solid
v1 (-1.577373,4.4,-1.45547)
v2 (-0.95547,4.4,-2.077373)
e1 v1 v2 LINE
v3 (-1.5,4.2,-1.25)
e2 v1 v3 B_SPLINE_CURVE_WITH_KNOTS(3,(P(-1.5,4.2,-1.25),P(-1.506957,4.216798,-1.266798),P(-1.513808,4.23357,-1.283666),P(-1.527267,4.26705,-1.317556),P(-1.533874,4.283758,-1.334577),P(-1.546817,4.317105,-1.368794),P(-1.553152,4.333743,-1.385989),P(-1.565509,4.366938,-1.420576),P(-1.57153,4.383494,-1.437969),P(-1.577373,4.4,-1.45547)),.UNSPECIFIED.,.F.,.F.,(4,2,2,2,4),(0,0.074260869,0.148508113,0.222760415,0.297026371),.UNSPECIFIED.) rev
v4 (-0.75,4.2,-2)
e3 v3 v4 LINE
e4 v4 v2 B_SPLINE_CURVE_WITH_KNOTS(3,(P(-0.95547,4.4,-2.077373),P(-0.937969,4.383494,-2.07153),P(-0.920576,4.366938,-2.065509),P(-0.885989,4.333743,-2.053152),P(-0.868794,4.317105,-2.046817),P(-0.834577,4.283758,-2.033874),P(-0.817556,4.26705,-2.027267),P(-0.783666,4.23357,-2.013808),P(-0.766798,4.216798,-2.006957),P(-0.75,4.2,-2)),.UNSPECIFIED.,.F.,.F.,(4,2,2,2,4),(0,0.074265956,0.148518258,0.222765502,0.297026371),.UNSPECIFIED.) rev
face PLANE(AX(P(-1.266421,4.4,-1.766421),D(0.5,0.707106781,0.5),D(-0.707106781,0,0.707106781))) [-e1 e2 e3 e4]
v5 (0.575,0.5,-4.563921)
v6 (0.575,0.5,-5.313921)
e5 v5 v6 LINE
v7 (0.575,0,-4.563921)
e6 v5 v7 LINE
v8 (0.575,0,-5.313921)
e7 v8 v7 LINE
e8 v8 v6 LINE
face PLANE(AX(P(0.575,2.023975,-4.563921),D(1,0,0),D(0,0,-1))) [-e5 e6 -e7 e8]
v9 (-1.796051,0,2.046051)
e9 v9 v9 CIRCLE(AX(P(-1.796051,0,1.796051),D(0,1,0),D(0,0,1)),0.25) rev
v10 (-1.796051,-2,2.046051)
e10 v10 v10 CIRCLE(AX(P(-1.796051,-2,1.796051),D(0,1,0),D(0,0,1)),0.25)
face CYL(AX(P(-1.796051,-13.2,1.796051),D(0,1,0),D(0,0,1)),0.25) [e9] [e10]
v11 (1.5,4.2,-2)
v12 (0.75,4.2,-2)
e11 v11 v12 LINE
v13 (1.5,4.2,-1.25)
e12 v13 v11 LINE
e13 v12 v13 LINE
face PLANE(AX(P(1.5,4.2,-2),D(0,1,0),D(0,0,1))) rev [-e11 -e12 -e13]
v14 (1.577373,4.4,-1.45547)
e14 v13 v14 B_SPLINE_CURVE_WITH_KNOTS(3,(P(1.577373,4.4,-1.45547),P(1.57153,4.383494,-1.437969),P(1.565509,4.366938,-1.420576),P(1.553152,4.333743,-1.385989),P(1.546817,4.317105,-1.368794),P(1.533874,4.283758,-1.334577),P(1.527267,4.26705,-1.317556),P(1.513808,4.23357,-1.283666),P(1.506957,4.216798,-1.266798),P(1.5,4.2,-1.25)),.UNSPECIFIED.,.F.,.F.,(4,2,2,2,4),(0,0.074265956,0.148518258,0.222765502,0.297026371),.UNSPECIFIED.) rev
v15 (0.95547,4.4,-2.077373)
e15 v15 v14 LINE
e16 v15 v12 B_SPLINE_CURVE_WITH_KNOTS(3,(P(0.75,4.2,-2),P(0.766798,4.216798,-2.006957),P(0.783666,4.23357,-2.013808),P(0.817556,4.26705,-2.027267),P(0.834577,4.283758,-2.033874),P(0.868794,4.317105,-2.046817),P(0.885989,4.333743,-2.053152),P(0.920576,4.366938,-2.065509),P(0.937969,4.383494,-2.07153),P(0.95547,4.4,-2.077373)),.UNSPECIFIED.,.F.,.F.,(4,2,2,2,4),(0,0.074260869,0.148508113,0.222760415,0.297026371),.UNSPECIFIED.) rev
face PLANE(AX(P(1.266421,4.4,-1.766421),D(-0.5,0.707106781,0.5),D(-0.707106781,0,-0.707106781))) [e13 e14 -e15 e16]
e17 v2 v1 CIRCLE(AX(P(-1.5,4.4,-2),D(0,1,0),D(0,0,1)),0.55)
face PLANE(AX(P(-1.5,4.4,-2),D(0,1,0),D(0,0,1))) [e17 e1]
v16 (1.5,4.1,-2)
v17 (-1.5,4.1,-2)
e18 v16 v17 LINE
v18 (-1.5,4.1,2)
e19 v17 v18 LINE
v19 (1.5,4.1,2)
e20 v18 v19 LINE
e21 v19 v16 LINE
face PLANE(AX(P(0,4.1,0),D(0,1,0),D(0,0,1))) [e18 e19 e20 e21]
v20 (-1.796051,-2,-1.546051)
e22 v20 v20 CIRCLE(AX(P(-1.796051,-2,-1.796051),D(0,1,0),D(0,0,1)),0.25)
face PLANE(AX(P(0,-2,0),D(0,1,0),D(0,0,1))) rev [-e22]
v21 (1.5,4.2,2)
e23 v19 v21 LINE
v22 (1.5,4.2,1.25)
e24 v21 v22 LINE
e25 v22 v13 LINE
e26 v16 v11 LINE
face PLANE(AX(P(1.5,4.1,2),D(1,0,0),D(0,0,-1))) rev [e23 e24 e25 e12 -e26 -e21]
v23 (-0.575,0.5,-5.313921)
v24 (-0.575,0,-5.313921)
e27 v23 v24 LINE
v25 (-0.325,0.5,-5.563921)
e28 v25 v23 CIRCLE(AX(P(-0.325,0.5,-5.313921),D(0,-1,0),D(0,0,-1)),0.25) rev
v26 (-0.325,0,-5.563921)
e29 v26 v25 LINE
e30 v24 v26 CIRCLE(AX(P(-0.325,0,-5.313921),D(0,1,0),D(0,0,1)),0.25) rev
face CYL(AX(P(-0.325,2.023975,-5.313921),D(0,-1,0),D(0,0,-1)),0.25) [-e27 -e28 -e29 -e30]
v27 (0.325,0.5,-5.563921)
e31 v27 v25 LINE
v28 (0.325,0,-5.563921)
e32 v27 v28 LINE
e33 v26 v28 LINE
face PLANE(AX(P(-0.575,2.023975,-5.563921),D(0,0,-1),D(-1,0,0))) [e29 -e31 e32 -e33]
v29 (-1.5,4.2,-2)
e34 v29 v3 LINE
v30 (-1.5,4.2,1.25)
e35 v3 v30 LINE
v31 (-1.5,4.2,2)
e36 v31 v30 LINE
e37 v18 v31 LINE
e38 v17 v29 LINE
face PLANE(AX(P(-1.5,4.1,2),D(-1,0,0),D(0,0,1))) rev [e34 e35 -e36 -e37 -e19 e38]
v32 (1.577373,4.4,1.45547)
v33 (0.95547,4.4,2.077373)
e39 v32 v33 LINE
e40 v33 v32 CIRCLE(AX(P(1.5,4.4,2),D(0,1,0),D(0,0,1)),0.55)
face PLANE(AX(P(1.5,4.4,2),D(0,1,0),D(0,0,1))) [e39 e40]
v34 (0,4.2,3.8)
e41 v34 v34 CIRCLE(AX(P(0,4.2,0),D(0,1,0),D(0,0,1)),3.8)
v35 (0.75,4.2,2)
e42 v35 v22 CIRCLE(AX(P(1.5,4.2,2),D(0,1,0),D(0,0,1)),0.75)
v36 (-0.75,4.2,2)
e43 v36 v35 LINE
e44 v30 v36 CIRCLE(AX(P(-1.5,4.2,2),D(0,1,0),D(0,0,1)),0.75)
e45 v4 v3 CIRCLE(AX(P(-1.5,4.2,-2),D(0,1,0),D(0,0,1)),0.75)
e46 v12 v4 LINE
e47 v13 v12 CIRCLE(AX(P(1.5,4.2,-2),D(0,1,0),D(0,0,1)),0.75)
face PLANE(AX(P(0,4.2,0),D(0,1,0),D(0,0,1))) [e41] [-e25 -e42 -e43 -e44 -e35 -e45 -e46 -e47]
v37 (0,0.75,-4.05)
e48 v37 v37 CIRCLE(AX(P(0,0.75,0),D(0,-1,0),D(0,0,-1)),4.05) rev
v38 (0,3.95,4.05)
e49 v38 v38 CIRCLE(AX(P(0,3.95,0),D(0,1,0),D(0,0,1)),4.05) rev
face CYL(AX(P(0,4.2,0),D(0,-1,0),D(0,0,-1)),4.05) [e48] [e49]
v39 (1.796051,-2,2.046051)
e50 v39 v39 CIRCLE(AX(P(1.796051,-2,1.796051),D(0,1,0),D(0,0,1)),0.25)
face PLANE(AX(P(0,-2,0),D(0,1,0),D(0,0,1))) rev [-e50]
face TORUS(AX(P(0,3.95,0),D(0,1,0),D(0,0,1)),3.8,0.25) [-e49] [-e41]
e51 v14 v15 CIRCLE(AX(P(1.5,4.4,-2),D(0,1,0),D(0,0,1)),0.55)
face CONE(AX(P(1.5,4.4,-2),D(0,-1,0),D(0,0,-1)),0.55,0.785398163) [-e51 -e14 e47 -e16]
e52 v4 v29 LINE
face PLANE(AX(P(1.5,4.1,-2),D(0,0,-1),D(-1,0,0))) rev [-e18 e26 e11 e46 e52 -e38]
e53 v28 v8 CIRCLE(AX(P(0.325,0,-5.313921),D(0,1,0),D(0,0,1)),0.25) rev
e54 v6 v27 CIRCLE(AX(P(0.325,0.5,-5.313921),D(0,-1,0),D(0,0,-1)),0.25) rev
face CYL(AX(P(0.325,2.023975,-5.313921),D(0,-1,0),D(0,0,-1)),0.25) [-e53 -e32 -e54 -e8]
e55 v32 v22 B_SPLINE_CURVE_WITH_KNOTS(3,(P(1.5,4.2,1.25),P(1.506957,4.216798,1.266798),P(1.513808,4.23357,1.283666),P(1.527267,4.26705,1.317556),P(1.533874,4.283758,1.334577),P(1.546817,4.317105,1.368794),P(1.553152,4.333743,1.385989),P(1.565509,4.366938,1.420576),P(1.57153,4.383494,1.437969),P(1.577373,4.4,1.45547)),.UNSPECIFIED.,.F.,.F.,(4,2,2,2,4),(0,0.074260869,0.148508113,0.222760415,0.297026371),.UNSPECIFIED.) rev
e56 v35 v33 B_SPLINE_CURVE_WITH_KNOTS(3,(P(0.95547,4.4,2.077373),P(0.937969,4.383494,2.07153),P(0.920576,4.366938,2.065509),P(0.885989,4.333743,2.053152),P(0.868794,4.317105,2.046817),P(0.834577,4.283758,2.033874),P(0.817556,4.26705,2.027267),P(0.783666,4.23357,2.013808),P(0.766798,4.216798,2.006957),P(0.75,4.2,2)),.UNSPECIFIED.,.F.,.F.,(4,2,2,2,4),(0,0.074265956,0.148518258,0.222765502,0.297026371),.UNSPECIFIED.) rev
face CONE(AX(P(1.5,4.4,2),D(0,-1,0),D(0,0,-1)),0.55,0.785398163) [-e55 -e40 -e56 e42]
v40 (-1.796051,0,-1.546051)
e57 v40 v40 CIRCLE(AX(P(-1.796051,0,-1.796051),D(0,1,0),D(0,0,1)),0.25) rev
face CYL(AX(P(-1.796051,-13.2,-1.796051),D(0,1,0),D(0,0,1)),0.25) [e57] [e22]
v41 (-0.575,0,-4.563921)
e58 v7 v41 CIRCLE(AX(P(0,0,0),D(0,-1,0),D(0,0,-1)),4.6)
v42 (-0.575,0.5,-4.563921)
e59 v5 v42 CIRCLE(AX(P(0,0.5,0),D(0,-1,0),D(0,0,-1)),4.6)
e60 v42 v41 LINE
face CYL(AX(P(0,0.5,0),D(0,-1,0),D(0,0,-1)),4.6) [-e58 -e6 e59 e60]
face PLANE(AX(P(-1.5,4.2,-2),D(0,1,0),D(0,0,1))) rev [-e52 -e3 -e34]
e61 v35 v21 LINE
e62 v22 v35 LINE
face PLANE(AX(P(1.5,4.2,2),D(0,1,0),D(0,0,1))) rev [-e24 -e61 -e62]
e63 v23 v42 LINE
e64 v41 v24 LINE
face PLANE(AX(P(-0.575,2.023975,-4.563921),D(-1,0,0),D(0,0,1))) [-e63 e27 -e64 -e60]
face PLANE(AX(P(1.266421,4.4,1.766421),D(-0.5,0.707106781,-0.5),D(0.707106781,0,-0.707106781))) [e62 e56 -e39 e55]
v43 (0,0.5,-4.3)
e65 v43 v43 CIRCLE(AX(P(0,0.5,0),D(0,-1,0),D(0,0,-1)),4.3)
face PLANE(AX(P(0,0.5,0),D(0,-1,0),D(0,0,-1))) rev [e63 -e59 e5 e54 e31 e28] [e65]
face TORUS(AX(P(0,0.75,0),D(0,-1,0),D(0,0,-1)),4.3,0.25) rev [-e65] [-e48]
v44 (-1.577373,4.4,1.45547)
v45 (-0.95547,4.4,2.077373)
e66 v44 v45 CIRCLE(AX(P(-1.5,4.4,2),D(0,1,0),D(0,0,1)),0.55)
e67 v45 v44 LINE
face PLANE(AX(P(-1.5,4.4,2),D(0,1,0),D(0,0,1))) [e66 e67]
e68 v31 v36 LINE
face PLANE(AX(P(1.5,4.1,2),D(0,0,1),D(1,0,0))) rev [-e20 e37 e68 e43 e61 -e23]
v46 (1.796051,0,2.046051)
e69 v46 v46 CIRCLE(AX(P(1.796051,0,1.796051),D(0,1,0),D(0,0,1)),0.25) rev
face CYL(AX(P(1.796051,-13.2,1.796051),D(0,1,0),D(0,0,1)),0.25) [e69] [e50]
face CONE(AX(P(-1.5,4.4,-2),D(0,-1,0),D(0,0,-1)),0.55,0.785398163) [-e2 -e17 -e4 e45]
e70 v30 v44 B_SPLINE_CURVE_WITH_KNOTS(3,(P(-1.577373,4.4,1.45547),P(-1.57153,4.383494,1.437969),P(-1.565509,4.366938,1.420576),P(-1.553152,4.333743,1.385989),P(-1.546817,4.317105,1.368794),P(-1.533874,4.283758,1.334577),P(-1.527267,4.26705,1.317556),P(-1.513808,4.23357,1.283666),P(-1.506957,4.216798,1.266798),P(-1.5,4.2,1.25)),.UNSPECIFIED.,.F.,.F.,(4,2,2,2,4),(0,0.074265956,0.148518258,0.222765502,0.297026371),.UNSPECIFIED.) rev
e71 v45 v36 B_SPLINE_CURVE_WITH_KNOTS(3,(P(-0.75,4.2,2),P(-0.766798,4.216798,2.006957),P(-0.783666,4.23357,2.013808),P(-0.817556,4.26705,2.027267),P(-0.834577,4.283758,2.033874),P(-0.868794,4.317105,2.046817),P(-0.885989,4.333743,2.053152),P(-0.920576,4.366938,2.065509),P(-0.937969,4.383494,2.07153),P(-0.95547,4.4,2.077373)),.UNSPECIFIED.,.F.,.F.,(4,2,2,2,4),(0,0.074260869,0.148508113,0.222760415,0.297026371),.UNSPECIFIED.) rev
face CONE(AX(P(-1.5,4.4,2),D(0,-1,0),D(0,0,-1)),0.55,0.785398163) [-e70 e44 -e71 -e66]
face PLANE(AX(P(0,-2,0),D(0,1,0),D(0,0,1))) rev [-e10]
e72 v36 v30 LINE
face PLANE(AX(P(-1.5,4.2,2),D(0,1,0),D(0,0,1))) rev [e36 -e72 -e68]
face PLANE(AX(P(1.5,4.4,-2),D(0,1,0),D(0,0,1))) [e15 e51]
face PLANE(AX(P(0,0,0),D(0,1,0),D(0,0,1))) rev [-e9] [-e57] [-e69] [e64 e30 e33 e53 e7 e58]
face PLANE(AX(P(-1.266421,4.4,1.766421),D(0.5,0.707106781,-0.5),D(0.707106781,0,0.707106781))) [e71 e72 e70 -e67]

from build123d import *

# Parameters (mm, degrees)
SKETCH1_R                   = 4.05
BASE_EXTRUSION_DEPTH        = 4.2
SKETCH2_W                   = 3
SKETCH2_H                   = 4
WINDOW_DEPTH                = 0.1
WINDOW_BUMPS_DEPTH          = 0.2
WINDOW_BUMPS_CHAMFERS_SIZE  = 0.2
SKETCH3_R                   = 4.6
FLANGE_DEPTH                = 0.5
SKETCH5_W                   = 1.15
SKETCH5_H                   = 1
HORIZONTAL_FLANGE_TAB_DEPTH = 0.5
ROUNDS_AND_FILLETS_R        = 0.25
SKETCH4_R                   = 0.25
LEADS_DEPTH                 = 13.2


with BuildPart() as part:
    # Sketch1 → Base Extrusion (new body)
    with BuildSketch(Plane(origin=(0, 0, 0), x_dir=(1, 0, 0), z_dir=(0, 1, 0))):
        with Locations(Location((0, 0, 0), (0, 0, 270))):
            Circle(SKETCH1_R)
    extrude(amount=BASE_EXTRUSION_DEPTH)

    # Sketch2 → Window (cut)
    with BuildSketch(Plane(origin=(0, 4.2, 0), x_dir=(1, 0, 0), z_dir=(0, 1, 0))):
        Rectangle(SKETCH2_W, SKETCH2_H)
    extrude(amount=-WINDOW_DEPTH, mode=Mode.SUBTRACT)

    # Sketch6 → Window Bumps (add)
    with BuildSketch(Plane(origin=(0, 4.2, 0), x_dir=(1, 0, 0), z_dir=(0, 1, 0))):
        with BuildLine():
            Line((-0.75, 2), (-1.5, 1.25))
            ThreePointArc((-1.5, 1.25), (-2.030330086, 2.530330086), (-0.75, 2))
        make_face()
        with BuildLine():
            Line((0.75, 2), (1.5, 1.25))
            ThreePointArc((1.5, 1.25), (2.030330086, 2.530330086), (0.75, 2))
        make_face()
        with BuildLine():
            Line((1.5, -1.25), (0.75, -2))
            ThreePointArc((0.75, -2), (2.030330086, -2.530330086), (1.5, -1.25))
        make_face()
        with BuildLine():
            Line((-1.5, -1.25), (-0.75, -2))
            ThreePointArc((-0.75, -2), (-2.030330086, -2.530330086), (-1.5, -1.25))
        make_face()
    extrude(amount=WINDOW_BUMPS_DEPTH)

    # Window Bumps Chamfers
    window_bumps_chamfers_edges = [part.edges().sort_by_distance(p)[0] for p in [
        (-2.030330086, 4.4, 2.530330086),
        (2.030330086, 4.4, 2.530330086),
        (2.030330086, 4.4, -2.530330086),
        (-2.030330086, 4.4, -2.530330086),
        (-1.125, 4.4, 1.625),
        (1.125, 4.4, 1.625),
        (1.125, 4.4, -1.625),
        (-1.125, 4.4, -1.625),
    ]]
    chamfer(window_bumps_chamfers_edges, length=WINDOW_BUMPS_CHAMFERS_SIZE - 0.0001)  # a hair under: the kernel refuses the full size

    # Sketch3 → Flange (add)
    with BuildSketch(Plane.XZ):
        with Locations(Location((0, 0, 0), (0, 0, 270))):
            Circle(SKETCH3_R)
    extrude(amount=-FLANGE_DEPTH)

    # Sketch5 → Horizontal Flange Tab (add)
    with BuildSketch(Plane.XZ):
        with Locations((0, -5.063921012)):
            Rectangle(SKETCH5_W, SKETCH5_H)
    extrude(amount=-HORIZONTAL_FLANGE_TAB_DEPTH)

    # Rounds and Fillets
    rounds_and_fillets_edges = [part.edges().sort_by_distance(p)[0] for p in [
        (0, 4.2, -4.05),
        (0, 0.5, -4.05),
        (-0.575, 0.25, -5.563921012),
        (0.575, 0.25, -5.563921012),
    ]]
    fillet(rounds_and_fillets_edges, radius=ROUNDS_AND_FILLETS_R)

    # Sketch4 → Leads (add)
    with BuildSketch(Plane.XZ):
        with Locations(Location((-1.796051224, -1.796051224, 0), (0, 0, 90))):
            Circle(SKETCH4_R)
        with Locations(Location((1.796051224, 1.796051224, 0), (0, 0, 90))):
            Circle(SKETCH4_R)
        with Locations(Location((-1.796051224, 1.796051224, 0), (0, 0, 90))):
            Circle(SKETCH4_R)
    extrude(amount=LEADS_DEPTH)

    # Leads Trim
    split(bisect_by=Plane(origin=(0, -2, 0), x_dir=(1, 0, 0), z_dir=(0, 1, 0)), keep=Keep.TOP)


solid = part.part
